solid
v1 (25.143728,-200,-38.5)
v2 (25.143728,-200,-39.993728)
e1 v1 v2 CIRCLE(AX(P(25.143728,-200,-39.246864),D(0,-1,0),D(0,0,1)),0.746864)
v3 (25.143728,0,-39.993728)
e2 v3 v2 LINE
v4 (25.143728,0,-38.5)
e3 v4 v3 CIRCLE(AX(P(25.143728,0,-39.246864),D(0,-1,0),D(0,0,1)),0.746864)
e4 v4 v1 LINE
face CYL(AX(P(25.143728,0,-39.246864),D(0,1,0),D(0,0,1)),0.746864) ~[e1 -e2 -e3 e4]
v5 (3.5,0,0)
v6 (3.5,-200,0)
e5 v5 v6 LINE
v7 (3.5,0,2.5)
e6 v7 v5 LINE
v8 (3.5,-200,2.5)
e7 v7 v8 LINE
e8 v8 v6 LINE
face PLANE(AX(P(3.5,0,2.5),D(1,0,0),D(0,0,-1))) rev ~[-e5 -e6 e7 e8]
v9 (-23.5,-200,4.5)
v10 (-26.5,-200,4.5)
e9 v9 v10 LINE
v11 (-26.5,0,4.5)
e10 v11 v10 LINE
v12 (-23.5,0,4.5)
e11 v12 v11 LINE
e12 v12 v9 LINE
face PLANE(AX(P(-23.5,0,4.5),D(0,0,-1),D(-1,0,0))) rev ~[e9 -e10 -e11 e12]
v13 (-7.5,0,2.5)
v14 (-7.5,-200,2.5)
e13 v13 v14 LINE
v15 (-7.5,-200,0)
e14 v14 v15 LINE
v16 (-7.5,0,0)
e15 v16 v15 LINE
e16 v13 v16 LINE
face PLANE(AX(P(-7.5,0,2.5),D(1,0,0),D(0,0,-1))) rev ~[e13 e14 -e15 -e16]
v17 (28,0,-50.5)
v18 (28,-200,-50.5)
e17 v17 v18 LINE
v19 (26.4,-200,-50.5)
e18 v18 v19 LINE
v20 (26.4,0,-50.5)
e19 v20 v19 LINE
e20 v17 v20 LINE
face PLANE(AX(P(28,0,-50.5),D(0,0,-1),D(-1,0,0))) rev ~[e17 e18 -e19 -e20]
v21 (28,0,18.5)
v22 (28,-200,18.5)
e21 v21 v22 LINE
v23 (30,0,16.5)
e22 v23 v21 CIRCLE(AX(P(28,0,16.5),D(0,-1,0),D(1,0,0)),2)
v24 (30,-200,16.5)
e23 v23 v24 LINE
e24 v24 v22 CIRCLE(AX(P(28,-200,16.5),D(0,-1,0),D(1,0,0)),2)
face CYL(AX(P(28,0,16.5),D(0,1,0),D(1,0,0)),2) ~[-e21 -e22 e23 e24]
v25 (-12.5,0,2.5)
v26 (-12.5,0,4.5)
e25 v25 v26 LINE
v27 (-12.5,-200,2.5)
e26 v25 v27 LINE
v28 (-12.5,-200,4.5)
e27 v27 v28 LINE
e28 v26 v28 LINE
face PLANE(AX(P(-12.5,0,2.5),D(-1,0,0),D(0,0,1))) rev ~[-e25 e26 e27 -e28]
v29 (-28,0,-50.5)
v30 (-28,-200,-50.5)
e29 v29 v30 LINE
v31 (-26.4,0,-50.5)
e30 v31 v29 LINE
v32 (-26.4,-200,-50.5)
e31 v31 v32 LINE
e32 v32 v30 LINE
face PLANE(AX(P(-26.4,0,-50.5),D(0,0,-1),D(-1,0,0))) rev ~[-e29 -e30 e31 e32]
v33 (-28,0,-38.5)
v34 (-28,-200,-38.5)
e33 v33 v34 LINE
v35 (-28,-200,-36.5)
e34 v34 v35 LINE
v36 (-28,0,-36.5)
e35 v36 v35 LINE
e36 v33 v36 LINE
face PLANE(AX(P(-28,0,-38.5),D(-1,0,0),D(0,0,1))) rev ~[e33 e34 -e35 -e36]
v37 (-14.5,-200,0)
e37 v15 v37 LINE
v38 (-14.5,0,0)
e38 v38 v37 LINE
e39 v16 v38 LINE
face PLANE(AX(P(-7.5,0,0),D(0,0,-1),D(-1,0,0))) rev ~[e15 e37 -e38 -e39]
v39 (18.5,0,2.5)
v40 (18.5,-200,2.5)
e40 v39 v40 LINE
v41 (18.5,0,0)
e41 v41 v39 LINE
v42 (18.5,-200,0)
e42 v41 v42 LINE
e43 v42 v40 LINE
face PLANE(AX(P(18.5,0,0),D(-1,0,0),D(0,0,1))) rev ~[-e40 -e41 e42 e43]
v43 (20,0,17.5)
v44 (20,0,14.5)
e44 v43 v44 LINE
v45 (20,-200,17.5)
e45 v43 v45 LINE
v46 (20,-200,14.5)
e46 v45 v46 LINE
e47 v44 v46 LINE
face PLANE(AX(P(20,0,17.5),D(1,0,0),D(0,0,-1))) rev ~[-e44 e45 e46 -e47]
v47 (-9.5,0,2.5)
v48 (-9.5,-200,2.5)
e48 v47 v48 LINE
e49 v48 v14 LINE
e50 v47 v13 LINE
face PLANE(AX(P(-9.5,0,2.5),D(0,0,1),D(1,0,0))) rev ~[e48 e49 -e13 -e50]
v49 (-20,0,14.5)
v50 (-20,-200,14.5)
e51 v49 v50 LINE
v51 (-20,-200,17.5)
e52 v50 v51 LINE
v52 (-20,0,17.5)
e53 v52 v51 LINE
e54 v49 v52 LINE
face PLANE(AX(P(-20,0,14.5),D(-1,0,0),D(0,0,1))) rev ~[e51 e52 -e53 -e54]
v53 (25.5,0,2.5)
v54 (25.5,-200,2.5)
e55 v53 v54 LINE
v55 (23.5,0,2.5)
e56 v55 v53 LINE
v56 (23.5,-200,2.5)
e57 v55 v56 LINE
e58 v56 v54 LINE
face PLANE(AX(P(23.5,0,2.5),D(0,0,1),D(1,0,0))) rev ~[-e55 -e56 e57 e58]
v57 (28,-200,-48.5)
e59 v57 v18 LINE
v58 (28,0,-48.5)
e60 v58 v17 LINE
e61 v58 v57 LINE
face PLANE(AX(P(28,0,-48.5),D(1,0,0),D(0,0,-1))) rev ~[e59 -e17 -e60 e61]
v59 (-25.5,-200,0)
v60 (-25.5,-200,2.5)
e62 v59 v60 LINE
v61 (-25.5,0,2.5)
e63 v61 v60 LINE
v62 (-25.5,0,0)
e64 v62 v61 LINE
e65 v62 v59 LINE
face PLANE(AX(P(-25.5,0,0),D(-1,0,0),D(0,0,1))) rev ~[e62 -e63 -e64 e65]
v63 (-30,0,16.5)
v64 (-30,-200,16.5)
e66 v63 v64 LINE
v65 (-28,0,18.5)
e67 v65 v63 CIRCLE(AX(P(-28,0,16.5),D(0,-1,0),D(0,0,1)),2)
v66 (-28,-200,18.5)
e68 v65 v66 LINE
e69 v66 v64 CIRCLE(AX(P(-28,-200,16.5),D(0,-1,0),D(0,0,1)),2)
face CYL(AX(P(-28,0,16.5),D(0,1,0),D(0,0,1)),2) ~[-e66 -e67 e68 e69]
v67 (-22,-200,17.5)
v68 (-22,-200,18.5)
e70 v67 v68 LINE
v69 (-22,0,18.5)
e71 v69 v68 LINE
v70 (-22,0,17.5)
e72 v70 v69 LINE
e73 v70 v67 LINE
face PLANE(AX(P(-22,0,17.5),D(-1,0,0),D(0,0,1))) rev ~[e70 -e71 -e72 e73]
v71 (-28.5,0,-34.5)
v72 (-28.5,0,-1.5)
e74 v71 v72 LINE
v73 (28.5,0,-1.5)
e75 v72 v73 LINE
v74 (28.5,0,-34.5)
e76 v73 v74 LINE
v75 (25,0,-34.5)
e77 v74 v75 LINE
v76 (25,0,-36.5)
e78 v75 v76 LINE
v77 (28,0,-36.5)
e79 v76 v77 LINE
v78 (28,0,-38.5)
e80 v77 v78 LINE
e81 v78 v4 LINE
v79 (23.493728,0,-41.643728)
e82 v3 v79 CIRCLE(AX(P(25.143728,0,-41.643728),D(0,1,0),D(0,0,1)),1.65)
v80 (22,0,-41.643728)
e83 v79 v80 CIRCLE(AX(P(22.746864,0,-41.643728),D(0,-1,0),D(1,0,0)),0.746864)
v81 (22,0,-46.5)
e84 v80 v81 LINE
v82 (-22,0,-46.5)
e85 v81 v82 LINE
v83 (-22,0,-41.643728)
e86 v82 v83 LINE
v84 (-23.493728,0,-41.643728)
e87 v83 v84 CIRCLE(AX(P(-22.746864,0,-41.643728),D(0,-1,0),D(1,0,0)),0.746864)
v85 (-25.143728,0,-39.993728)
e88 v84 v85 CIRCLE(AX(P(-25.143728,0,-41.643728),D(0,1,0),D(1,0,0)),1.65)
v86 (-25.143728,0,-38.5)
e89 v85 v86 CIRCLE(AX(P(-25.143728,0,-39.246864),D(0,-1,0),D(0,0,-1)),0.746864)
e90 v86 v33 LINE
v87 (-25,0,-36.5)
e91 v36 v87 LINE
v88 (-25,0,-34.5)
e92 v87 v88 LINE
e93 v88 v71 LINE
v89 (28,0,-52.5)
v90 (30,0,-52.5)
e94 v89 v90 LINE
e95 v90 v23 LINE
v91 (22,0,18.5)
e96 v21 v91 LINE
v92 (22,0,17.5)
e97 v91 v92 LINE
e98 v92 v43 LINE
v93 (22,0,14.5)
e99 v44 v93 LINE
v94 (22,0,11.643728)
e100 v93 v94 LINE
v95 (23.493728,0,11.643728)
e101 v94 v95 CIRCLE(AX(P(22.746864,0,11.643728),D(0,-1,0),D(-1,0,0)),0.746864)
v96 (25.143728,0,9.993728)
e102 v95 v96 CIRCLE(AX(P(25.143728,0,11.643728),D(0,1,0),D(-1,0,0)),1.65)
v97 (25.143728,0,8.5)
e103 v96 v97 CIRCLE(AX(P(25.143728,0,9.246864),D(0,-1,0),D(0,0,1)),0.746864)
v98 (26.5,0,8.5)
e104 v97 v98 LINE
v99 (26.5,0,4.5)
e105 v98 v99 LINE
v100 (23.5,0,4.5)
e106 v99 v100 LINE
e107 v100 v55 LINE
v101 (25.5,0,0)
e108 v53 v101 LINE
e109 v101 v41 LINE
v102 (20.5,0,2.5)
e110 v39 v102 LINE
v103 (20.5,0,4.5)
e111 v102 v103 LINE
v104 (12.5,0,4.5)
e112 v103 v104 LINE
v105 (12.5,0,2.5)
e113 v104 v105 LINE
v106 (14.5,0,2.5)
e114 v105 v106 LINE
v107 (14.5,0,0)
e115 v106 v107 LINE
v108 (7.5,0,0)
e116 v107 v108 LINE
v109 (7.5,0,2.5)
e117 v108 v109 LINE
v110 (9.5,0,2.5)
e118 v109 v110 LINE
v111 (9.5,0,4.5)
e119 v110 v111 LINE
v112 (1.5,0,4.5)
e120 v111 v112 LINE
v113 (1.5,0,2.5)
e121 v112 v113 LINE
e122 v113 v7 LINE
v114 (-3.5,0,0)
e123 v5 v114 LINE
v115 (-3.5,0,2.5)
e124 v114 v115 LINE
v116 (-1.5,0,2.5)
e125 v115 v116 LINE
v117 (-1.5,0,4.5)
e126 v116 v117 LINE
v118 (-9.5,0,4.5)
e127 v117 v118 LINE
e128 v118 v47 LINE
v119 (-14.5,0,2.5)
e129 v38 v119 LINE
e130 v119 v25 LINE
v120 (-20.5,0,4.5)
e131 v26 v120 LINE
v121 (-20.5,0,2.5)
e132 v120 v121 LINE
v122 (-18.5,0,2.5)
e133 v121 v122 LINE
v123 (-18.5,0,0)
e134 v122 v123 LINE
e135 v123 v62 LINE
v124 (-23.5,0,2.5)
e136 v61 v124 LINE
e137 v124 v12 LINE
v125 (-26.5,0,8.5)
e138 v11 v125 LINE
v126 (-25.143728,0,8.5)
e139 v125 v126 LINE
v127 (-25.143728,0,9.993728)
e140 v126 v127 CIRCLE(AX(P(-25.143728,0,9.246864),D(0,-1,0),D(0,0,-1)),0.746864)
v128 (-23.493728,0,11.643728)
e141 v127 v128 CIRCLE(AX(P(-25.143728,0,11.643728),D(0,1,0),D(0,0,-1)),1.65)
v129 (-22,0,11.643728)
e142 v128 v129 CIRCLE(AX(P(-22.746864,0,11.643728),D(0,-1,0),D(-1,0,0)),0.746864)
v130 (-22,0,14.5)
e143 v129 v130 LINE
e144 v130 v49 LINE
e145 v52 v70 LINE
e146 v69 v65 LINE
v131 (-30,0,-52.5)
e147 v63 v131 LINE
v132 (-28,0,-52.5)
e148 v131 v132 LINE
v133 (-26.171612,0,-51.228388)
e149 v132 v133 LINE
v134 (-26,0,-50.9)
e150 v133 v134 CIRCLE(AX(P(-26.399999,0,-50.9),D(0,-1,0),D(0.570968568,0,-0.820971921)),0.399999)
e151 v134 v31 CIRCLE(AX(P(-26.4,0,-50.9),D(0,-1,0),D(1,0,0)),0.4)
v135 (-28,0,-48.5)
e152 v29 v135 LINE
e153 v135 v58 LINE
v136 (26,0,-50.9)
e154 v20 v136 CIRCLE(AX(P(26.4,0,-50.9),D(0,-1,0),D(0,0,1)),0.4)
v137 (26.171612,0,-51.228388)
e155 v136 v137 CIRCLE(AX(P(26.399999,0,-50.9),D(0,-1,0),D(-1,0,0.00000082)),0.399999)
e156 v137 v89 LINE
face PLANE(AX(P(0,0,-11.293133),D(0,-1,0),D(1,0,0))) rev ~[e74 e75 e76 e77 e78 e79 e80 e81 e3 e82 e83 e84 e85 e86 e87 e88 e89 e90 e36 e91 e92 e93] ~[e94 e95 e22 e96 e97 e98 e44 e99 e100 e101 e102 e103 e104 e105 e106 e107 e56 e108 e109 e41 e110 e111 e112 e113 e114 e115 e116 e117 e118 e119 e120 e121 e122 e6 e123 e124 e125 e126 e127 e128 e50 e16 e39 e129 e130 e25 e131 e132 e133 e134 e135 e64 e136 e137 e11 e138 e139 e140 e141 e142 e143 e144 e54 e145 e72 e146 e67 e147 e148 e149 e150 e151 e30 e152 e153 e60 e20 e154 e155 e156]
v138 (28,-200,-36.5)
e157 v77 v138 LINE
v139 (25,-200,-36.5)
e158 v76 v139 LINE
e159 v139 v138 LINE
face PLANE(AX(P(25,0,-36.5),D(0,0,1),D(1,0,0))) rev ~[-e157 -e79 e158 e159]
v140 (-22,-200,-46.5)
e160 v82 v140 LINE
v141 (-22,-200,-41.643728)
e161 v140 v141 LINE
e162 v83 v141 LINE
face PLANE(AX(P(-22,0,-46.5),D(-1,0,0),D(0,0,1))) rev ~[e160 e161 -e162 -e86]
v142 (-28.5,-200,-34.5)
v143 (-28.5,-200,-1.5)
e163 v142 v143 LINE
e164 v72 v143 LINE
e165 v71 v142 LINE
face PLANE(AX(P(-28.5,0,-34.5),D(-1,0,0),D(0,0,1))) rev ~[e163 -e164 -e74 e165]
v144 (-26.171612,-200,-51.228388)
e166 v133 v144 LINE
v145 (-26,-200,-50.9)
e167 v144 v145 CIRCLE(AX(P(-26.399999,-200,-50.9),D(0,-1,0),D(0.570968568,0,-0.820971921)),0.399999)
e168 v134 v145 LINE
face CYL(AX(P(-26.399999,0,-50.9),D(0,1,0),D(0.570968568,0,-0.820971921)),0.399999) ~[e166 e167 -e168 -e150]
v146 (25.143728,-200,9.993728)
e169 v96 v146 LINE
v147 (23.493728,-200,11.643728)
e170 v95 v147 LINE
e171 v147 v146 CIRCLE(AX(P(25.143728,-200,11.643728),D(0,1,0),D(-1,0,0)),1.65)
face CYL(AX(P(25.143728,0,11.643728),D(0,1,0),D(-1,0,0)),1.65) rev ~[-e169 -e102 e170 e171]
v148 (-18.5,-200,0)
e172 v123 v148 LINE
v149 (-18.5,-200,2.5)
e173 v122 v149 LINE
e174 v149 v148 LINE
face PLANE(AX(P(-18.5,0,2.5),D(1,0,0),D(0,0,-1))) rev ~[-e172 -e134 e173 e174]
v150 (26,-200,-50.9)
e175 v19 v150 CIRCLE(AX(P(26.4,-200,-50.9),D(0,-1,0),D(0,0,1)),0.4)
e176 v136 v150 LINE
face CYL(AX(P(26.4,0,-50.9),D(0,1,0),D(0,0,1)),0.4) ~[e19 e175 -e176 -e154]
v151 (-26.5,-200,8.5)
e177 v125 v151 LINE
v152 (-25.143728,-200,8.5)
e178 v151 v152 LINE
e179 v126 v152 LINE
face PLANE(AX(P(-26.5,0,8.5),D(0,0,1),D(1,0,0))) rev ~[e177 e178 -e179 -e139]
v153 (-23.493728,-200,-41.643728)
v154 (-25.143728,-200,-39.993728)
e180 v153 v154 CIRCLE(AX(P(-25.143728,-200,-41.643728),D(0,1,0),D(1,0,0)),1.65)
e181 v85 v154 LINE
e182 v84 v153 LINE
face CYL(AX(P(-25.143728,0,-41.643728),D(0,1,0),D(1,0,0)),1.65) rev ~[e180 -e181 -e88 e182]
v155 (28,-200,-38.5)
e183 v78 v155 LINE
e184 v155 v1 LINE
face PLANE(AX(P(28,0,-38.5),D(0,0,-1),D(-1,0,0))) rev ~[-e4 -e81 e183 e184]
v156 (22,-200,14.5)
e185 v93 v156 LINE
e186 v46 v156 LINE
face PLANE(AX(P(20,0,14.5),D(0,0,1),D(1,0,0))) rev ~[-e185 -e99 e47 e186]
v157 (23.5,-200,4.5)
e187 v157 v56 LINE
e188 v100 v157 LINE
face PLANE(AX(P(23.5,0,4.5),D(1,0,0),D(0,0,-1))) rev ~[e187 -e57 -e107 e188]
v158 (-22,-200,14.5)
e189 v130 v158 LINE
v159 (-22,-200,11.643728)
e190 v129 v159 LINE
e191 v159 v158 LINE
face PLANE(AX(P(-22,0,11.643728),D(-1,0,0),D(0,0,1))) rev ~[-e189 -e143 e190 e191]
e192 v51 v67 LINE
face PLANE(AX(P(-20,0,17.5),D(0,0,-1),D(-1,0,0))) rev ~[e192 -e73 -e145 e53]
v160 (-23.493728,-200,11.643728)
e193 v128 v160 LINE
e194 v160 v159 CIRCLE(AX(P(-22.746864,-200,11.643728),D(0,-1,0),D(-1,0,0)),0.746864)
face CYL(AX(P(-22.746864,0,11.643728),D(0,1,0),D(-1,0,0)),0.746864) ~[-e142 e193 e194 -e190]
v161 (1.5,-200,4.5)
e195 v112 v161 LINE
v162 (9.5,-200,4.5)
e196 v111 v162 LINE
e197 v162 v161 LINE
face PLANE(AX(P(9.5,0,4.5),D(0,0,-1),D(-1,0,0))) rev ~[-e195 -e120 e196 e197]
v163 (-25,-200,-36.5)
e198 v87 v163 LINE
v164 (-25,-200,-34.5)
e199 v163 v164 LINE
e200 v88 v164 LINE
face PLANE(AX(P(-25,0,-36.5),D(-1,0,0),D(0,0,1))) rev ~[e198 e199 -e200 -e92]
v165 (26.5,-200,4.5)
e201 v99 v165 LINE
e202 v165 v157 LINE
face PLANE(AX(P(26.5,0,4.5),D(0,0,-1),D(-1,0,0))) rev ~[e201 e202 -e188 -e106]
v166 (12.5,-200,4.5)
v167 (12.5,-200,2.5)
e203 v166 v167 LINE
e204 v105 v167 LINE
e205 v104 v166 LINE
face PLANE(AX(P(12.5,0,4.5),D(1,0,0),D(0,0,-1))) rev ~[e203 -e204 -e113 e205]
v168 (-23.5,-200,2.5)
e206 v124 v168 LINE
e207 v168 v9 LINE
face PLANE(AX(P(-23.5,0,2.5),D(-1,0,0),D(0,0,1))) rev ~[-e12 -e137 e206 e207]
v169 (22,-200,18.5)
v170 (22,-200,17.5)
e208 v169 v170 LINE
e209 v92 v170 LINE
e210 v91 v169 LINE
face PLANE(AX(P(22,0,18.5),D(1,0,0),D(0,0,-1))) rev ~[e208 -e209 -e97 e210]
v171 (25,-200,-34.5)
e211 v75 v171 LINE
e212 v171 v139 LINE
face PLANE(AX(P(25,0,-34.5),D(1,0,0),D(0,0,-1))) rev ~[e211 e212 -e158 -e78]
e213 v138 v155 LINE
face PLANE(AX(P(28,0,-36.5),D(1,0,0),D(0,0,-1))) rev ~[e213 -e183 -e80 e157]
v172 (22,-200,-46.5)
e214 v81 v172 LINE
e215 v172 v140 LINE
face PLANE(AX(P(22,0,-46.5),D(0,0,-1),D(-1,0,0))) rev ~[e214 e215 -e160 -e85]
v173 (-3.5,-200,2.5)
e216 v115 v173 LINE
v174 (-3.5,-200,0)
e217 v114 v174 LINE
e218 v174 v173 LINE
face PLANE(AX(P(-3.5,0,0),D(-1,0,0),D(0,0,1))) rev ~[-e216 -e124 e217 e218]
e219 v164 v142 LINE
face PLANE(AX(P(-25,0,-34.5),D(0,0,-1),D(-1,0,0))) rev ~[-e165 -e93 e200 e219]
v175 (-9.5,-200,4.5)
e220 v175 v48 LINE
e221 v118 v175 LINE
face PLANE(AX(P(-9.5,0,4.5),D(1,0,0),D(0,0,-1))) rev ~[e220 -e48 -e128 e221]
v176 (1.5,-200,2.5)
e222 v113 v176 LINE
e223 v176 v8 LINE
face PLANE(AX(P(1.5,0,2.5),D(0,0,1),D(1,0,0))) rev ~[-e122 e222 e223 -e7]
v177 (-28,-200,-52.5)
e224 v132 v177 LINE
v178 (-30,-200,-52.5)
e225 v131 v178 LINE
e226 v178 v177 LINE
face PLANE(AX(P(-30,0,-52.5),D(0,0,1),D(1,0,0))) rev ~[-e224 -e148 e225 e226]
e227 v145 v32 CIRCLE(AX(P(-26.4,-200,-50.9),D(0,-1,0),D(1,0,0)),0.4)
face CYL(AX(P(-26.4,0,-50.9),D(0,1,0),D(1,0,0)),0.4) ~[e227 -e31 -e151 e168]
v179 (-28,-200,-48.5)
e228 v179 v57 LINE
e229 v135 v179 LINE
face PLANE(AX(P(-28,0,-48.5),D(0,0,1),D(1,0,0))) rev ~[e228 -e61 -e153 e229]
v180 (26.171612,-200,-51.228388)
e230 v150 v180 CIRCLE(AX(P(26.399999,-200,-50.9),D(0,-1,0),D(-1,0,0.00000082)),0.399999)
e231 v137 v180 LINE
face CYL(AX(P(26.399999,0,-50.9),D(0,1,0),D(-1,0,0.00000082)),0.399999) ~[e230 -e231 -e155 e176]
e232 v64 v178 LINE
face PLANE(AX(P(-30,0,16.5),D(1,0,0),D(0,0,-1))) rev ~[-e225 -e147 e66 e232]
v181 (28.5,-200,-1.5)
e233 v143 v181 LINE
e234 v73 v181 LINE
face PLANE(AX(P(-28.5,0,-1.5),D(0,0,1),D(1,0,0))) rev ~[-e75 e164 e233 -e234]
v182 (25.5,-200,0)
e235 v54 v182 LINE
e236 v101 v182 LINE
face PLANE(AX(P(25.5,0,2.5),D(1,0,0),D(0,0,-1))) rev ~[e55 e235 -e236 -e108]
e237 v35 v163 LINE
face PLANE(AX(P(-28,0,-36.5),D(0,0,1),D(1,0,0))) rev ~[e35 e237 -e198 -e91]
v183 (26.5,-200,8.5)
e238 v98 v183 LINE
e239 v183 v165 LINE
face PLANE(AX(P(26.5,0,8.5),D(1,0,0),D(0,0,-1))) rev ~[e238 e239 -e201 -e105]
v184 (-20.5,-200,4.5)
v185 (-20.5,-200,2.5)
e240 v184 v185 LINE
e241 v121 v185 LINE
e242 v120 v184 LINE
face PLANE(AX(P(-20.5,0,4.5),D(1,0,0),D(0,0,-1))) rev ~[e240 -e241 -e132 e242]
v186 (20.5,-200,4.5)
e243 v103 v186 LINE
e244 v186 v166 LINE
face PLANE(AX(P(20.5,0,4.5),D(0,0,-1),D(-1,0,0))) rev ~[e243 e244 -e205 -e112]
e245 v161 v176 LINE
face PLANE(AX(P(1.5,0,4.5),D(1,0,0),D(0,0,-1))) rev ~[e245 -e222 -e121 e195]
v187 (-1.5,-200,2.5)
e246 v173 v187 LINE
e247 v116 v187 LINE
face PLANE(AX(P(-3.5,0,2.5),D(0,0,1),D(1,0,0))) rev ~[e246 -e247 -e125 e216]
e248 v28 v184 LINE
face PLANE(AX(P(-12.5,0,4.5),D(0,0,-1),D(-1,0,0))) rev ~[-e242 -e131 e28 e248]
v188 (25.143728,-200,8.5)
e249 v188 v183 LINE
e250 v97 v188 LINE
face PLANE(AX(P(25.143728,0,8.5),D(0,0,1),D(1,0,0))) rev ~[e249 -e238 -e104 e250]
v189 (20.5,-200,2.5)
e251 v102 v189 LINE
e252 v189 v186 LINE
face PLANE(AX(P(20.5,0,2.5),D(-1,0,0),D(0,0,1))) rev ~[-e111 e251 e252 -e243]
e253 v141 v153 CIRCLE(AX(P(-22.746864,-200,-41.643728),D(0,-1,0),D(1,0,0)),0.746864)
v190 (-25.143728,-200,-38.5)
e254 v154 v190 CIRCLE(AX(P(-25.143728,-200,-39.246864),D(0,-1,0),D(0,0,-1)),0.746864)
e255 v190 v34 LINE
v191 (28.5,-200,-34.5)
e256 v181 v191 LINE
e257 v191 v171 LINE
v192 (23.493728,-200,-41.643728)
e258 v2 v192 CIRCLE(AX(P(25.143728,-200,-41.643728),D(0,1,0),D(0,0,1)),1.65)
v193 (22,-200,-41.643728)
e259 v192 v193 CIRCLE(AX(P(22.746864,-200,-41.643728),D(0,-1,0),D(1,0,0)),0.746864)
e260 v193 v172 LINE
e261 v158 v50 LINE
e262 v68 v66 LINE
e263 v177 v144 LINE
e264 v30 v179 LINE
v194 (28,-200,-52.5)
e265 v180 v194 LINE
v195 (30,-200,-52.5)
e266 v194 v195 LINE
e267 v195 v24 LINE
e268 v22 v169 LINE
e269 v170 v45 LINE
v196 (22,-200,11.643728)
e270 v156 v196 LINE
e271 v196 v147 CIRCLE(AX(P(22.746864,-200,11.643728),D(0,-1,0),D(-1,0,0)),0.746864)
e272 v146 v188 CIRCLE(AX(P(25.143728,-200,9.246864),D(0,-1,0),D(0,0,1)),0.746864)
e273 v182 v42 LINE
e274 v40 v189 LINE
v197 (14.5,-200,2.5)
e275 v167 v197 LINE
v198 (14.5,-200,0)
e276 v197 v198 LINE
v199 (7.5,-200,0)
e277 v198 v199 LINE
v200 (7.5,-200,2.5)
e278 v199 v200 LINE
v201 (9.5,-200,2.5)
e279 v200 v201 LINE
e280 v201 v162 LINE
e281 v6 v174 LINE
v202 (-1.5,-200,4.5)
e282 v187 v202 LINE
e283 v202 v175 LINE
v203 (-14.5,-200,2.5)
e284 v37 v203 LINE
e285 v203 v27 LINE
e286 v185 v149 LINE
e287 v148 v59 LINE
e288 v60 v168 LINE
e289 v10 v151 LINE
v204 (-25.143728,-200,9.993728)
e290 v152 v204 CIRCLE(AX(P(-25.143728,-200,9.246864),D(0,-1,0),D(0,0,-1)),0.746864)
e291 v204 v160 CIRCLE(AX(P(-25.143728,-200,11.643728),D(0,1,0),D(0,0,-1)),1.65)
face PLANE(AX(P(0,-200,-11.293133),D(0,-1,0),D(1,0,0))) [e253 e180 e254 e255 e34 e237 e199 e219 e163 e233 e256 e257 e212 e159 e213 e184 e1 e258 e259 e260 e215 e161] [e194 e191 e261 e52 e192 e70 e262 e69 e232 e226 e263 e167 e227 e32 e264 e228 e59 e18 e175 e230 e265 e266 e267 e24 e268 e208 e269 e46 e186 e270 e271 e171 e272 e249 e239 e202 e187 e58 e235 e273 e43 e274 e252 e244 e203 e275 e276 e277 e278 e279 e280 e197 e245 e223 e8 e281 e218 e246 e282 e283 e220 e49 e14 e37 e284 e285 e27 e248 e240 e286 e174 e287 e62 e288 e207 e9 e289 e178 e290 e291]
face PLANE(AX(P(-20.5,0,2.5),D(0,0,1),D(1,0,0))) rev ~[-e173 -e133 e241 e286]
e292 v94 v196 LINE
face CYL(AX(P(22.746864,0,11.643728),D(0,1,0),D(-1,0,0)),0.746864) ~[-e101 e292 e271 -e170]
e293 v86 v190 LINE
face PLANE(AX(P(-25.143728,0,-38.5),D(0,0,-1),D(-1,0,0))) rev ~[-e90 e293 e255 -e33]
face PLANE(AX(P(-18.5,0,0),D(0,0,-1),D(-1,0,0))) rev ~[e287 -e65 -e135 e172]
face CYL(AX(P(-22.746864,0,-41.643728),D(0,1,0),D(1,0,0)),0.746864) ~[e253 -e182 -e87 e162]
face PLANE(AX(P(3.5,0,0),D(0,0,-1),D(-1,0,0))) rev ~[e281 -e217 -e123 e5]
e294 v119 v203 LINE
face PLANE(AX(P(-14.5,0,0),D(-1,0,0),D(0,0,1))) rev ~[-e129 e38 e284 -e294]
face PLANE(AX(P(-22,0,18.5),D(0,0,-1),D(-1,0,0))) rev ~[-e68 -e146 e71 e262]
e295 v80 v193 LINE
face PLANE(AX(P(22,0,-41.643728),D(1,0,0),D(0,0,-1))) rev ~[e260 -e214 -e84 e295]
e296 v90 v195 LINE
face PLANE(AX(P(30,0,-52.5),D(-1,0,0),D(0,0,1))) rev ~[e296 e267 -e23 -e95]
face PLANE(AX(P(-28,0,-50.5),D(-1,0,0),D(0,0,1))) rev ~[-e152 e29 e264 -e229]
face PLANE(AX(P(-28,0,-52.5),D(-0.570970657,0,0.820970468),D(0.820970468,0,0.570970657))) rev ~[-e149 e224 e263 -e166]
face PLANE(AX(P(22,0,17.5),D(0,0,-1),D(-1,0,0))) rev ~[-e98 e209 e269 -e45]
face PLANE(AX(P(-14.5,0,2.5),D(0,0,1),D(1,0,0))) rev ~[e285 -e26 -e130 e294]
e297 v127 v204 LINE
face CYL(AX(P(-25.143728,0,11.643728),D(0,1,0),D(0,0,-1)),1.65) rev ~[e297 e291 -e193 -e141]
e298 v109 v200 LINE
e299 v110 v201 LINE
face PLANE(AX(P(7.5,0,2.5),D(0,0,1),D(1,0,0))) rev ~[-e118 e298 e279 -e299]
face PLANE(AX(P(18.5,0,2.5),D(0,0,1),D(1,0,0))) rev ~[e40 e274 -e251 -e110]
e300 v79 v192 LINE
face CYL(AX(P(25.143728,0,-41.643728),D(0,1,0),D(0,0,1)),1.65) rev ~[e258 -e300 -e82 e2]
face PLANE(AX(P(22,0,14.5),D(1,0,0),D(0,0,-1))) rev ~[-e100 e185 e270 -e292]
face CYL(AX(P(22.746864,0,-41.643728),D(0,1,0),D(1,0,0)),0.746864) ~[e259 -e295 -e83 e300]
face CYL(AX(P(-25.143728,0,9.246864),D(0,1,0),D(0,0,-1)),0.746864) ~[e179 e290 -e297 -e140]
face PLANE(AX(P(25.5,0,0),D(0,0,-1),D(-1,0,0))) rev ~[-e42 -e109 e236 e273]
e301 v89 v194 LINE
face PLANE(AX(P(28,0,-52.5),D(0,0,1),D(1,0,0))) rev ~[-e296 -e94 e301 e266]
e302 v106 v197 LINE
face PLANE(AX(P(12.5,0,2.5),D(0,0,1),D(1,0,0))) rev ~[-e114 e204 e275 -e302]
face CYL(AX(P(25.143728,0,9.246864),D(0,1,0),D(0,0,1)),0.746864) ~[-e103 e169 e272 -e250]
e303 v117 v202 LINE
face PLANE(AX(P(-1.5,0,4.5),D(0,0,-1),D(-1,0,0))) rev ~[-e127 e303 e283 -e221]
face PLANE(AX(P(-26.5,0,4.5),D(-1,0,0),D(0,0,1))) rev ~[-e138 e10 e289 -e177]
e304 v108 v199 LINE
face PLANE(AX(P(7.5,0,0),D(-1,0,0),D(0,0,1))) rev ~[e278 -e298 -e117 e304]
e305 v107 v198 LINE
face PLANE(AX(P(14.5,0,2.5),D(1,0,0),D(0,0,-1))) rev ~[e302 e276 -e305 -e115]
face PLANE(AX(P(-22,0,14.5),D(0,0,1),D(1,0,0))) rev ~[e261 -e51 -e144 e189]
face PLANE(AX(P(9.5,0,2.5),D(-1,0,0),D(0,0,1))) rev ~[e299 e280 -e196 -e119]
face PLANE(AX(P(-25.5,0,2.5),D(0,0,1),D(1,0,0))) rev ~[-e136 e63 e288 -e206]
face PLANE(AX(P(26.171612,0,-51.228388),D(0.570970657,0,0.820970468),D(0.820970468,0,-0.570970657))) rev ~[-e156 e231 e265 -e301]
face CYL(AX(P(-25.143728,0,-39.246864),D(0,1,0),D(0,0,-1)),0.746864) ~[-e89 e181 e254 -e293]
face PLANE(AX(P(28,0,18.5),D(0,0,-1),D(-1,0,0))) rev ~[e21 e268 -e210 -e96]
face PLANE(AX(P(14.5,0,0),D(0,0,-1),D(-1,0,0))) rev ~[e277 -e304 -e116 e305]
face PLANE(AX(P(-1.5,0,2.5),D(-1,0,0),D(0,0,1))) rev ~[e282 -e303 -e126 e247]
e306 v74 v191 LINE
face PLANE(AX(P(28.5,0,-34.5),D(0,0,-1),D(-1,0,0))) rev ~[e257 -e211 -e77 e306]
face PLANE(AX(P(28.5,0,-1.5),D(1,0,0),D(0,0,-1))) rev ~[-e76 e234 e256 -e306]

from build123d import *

# Parameters (mm, degrees)
F1_DEPTH = 200


# Not quite as in the source:
# - ends of sketch curves that miss each other by under 0.0002 mm in the source are joined


with BuildPart() as f1:
    # F0 (on Front) → F1 (new body)
    with BuildSketch(Plane.XZ):
        with BuildLine():
            Line((26.171612, -51.228388), (28, -52.5))
            Line((28, -52.5), (30, -52.5))
            Line((30, -52.5), (30, 16.5))
            ThreePointArc((30, 16.5), (29.4142135624, 17.9142135624), (28, 18.5))
            Line((28, 18.5), (22, 18.5))
            Line((22, 18.5), (22, 17.5))
            Line((22, 17.5), (20, 17.5))
            Line((20, 17.5), (20, 14.5))
            Line((20, 14.5), (22, 14.5))
            Line((22, 14.5), (22, 11.643728))
            ThreePointArc((22, 11.643728), (22.746864, 10.896864), (23.493728, 11.643728))
            ThreePointArc((23.493728, 11.643728), (26.310454189, 12.810454189), (25.143728, 9.993728))
            ThreePointArc((25.143728, 9.993728), (24.396864, 9.246864), (25.143728, 8.5))
            Line((25.143728, 8.5), (26.5, 8.5))
            Line((26.5, 8.5), (26.5, 4.5))
            Line((26.5, 4.5), (23.5, 4.5))
            Line((23.5, 4.5), (23.5, 2.5))
            Line((23.5, 2.5), (25.5, 2.5))
            Line((25.5, 2.5), (25.5, 0))
            Line((25.5, 0), (18.5, 0))
            Line((18.5, 0), (18.5, 2.5))
            Line((18.5, 2.5), (20.5, 2.5))
            Line((20.5, 2.5), (20.5, 4.5))
            Line((20.5, 4.5), (12.5, 4.5))
            Line((12.5, 4.5), (12.5, 2.5))
            Line((12.5, 2.5), (14.5, 2.5))
            Line((14.5, 2.5), (14.5, 0))
            Line((14.5, 0), (7.5, 0))
            Line((7.5, 0), (7.5, 2.5))
            Line((7.5, 2.5), (9.5, 2.5))
            Line((9.5, 2.5), (9.5, 4.5))
            Line((9.5, 4.5), (1.5, 4.5))
            Line((1.5, 4.5), (1.5, 2.5))
            Line((1.5, 2.5), (3.5, 2.5))
            Line((3.5, 2.5), (3.5, 0))
            Line((3.5, 0), (-3.5, 0))
            Line((-3.5, 0), (-3.5, 2.5))
            Line((-3.5, 2.5), (-1.5, 2.5))
            Line((-1.5, 2.5), (-1.5, 4.5))
            Line((-1.5, 4.5), (-9.5, 4.5))
            Line((-9.5, 4.5), (-9.5, 2.5))
            Line((-9.5, 2.5), (-7.5, 2.5))
            Line((-7.5, 2.5), (-7.5, 0))
            Line((-7.5, 0), (-14.5, 0))
            Line((-14.5, 0), (-14.5, 2.5))
            Line((-14.5, 2.5), (-12.5, 2.5))
            Line((-12.5, 2.5), (-12.5, 4.5))
            Line((-12.5, 4.5), (-20.5, 4.5))
            Line((-20.5, 4.5), (-20.5, 2.5))
            Line((-20.5, 2.5), (-18.5, 2.5))
            Line((-18.5, 2.5), (-18.5, 0))
            Line((-18.5, 0), (-25.5, 0))
            Line((-25.5, 0), (-25.5, 2.5))
            Line((-25.5, 2.5), (-23.5, 2.5))
            Line((-23.5, 2.5), (-23.5, 4.5))
            Line((-23.5, 4.5), (-26.5, 4.5))
            Line((-26.5, 4.5), (-26.5, 8.5))
            Line((-26.5, 8.5), (-25.143728, 8.5))
            ThreePointArc((-25.143728, 8.5), (-24.396864, 9.246864), (-25.143728, 9.993728))
            ThreePointArc((-25.143728, 9.993728), (-26.310454189, 12.810454189), (-23.493728, 11.643728))
            ThreePointArc((-23.493728, 11.643728), (-22.746864, 10.896864), (-22, 11.643728))
            Line((-22, 11.643728), (-22, 14.5))
            Line((-22, 14.5), (-20, 14.5))
            Line((-20, 14.5), (-20, 17.5))
            Line((-20, 17.5), (-22, 17.5))
            Line((-22, 17.5), (-22, 18.5))
            Line((-22, 18.5), (-28, 18.5))
            ThreePointArc((-28, 18.5), (-29.4142135624, 17.9142135624), (-30, 16.5))
            Line((-30, 16.5), (-30, -52.5))
            Line((-30, -52.5), (-28, -52.5))
            Line((-28, -52.5), (-26.171612, -51.228388))
            ThreePointArc((-26.171612, -51.228388), (-26.0454895845, -51.0852629626), (-26, -50.9))
            ThreePointArc((-26, -50.9), (-26.1171572875, -50.6171572875), (-26.4, -50.5))
            Line((-26.4, -50.5), (-28, -50.5))
            Line((-28, -50.5), (-28, -48.5))
            Line((-28, -48.5), (28, -48.5))
            Line((28, -48.5), (28, -50.5))
            Line((28, -50.5), (26.4, -50.5))
            ThreePointArc((26.4, -50.5), (26.1171572875, -50.6171572875), (26, -50.9))
            ThreePointArc((26, -50.9), (26.0454895845, -51.0852629626), (26.171612, -51.228388))
        make_face()
        with BuildLine():
            Line((-22, -46.5), (-22, -41.643728))
            ThreePointArc((-22, -41.643728), (-22.746864, -40.896864), (-23.493728, -41.643728))
            ThreePointArc((-23.493728, -41.643728), (-26.310454189, -42.810454189), (-25.143728, -39.993728))
            ThreePointArc((-25.143728, -39.993728), (-24.396864, -39.246864), (-25.143728, -38.5))
            Line((-25.143728, -38.5), (-28, -38.5))
            Line((-28, -38.5), (-28, -36.5))
            Line((-28, -36.5), (-25, -36.5))
            Line((-25, -36.5), (-25, -34.5))
            Line((-25, -34.5), (-28.5, -34.5))
            Line((-28.5, -34.5), (-28.5, -1.5))
            Line((-28.5, -1.5), (28.5, -1.5))
            Line((28.5, -1.5), (28.5, -34.5))
            Line((28.5, -34.5), (25, -34.5))
            Line((25, -34.5), (25, -36.5))
            Line((25, -36.5), (28, -36.5))
            Line((28, -36.5), (28, -38.5))
            Line((28, -38.5), (25.143728, -38.5))
            ThreePointArc((25.143728, -38.5), (24.396864, -39.246864), (25.143728, -39.993728))
            ThreePointArc((25.143728, -39.993728), (26.310454189, -42.810454189), (23.493728, -41.643728))
            ThreePointArc((23.493728, -41.643728), (22.746864, -40.896864), (22, -41.643728))
            Line((22, -41.643728), (22, -46.5))
            Line((22, -46.5), (-22, -46.5))
        make_face(mode=Mode.SUBTRACT)
    extrude(amount=F1_DEPTH)


solid = f1.part
